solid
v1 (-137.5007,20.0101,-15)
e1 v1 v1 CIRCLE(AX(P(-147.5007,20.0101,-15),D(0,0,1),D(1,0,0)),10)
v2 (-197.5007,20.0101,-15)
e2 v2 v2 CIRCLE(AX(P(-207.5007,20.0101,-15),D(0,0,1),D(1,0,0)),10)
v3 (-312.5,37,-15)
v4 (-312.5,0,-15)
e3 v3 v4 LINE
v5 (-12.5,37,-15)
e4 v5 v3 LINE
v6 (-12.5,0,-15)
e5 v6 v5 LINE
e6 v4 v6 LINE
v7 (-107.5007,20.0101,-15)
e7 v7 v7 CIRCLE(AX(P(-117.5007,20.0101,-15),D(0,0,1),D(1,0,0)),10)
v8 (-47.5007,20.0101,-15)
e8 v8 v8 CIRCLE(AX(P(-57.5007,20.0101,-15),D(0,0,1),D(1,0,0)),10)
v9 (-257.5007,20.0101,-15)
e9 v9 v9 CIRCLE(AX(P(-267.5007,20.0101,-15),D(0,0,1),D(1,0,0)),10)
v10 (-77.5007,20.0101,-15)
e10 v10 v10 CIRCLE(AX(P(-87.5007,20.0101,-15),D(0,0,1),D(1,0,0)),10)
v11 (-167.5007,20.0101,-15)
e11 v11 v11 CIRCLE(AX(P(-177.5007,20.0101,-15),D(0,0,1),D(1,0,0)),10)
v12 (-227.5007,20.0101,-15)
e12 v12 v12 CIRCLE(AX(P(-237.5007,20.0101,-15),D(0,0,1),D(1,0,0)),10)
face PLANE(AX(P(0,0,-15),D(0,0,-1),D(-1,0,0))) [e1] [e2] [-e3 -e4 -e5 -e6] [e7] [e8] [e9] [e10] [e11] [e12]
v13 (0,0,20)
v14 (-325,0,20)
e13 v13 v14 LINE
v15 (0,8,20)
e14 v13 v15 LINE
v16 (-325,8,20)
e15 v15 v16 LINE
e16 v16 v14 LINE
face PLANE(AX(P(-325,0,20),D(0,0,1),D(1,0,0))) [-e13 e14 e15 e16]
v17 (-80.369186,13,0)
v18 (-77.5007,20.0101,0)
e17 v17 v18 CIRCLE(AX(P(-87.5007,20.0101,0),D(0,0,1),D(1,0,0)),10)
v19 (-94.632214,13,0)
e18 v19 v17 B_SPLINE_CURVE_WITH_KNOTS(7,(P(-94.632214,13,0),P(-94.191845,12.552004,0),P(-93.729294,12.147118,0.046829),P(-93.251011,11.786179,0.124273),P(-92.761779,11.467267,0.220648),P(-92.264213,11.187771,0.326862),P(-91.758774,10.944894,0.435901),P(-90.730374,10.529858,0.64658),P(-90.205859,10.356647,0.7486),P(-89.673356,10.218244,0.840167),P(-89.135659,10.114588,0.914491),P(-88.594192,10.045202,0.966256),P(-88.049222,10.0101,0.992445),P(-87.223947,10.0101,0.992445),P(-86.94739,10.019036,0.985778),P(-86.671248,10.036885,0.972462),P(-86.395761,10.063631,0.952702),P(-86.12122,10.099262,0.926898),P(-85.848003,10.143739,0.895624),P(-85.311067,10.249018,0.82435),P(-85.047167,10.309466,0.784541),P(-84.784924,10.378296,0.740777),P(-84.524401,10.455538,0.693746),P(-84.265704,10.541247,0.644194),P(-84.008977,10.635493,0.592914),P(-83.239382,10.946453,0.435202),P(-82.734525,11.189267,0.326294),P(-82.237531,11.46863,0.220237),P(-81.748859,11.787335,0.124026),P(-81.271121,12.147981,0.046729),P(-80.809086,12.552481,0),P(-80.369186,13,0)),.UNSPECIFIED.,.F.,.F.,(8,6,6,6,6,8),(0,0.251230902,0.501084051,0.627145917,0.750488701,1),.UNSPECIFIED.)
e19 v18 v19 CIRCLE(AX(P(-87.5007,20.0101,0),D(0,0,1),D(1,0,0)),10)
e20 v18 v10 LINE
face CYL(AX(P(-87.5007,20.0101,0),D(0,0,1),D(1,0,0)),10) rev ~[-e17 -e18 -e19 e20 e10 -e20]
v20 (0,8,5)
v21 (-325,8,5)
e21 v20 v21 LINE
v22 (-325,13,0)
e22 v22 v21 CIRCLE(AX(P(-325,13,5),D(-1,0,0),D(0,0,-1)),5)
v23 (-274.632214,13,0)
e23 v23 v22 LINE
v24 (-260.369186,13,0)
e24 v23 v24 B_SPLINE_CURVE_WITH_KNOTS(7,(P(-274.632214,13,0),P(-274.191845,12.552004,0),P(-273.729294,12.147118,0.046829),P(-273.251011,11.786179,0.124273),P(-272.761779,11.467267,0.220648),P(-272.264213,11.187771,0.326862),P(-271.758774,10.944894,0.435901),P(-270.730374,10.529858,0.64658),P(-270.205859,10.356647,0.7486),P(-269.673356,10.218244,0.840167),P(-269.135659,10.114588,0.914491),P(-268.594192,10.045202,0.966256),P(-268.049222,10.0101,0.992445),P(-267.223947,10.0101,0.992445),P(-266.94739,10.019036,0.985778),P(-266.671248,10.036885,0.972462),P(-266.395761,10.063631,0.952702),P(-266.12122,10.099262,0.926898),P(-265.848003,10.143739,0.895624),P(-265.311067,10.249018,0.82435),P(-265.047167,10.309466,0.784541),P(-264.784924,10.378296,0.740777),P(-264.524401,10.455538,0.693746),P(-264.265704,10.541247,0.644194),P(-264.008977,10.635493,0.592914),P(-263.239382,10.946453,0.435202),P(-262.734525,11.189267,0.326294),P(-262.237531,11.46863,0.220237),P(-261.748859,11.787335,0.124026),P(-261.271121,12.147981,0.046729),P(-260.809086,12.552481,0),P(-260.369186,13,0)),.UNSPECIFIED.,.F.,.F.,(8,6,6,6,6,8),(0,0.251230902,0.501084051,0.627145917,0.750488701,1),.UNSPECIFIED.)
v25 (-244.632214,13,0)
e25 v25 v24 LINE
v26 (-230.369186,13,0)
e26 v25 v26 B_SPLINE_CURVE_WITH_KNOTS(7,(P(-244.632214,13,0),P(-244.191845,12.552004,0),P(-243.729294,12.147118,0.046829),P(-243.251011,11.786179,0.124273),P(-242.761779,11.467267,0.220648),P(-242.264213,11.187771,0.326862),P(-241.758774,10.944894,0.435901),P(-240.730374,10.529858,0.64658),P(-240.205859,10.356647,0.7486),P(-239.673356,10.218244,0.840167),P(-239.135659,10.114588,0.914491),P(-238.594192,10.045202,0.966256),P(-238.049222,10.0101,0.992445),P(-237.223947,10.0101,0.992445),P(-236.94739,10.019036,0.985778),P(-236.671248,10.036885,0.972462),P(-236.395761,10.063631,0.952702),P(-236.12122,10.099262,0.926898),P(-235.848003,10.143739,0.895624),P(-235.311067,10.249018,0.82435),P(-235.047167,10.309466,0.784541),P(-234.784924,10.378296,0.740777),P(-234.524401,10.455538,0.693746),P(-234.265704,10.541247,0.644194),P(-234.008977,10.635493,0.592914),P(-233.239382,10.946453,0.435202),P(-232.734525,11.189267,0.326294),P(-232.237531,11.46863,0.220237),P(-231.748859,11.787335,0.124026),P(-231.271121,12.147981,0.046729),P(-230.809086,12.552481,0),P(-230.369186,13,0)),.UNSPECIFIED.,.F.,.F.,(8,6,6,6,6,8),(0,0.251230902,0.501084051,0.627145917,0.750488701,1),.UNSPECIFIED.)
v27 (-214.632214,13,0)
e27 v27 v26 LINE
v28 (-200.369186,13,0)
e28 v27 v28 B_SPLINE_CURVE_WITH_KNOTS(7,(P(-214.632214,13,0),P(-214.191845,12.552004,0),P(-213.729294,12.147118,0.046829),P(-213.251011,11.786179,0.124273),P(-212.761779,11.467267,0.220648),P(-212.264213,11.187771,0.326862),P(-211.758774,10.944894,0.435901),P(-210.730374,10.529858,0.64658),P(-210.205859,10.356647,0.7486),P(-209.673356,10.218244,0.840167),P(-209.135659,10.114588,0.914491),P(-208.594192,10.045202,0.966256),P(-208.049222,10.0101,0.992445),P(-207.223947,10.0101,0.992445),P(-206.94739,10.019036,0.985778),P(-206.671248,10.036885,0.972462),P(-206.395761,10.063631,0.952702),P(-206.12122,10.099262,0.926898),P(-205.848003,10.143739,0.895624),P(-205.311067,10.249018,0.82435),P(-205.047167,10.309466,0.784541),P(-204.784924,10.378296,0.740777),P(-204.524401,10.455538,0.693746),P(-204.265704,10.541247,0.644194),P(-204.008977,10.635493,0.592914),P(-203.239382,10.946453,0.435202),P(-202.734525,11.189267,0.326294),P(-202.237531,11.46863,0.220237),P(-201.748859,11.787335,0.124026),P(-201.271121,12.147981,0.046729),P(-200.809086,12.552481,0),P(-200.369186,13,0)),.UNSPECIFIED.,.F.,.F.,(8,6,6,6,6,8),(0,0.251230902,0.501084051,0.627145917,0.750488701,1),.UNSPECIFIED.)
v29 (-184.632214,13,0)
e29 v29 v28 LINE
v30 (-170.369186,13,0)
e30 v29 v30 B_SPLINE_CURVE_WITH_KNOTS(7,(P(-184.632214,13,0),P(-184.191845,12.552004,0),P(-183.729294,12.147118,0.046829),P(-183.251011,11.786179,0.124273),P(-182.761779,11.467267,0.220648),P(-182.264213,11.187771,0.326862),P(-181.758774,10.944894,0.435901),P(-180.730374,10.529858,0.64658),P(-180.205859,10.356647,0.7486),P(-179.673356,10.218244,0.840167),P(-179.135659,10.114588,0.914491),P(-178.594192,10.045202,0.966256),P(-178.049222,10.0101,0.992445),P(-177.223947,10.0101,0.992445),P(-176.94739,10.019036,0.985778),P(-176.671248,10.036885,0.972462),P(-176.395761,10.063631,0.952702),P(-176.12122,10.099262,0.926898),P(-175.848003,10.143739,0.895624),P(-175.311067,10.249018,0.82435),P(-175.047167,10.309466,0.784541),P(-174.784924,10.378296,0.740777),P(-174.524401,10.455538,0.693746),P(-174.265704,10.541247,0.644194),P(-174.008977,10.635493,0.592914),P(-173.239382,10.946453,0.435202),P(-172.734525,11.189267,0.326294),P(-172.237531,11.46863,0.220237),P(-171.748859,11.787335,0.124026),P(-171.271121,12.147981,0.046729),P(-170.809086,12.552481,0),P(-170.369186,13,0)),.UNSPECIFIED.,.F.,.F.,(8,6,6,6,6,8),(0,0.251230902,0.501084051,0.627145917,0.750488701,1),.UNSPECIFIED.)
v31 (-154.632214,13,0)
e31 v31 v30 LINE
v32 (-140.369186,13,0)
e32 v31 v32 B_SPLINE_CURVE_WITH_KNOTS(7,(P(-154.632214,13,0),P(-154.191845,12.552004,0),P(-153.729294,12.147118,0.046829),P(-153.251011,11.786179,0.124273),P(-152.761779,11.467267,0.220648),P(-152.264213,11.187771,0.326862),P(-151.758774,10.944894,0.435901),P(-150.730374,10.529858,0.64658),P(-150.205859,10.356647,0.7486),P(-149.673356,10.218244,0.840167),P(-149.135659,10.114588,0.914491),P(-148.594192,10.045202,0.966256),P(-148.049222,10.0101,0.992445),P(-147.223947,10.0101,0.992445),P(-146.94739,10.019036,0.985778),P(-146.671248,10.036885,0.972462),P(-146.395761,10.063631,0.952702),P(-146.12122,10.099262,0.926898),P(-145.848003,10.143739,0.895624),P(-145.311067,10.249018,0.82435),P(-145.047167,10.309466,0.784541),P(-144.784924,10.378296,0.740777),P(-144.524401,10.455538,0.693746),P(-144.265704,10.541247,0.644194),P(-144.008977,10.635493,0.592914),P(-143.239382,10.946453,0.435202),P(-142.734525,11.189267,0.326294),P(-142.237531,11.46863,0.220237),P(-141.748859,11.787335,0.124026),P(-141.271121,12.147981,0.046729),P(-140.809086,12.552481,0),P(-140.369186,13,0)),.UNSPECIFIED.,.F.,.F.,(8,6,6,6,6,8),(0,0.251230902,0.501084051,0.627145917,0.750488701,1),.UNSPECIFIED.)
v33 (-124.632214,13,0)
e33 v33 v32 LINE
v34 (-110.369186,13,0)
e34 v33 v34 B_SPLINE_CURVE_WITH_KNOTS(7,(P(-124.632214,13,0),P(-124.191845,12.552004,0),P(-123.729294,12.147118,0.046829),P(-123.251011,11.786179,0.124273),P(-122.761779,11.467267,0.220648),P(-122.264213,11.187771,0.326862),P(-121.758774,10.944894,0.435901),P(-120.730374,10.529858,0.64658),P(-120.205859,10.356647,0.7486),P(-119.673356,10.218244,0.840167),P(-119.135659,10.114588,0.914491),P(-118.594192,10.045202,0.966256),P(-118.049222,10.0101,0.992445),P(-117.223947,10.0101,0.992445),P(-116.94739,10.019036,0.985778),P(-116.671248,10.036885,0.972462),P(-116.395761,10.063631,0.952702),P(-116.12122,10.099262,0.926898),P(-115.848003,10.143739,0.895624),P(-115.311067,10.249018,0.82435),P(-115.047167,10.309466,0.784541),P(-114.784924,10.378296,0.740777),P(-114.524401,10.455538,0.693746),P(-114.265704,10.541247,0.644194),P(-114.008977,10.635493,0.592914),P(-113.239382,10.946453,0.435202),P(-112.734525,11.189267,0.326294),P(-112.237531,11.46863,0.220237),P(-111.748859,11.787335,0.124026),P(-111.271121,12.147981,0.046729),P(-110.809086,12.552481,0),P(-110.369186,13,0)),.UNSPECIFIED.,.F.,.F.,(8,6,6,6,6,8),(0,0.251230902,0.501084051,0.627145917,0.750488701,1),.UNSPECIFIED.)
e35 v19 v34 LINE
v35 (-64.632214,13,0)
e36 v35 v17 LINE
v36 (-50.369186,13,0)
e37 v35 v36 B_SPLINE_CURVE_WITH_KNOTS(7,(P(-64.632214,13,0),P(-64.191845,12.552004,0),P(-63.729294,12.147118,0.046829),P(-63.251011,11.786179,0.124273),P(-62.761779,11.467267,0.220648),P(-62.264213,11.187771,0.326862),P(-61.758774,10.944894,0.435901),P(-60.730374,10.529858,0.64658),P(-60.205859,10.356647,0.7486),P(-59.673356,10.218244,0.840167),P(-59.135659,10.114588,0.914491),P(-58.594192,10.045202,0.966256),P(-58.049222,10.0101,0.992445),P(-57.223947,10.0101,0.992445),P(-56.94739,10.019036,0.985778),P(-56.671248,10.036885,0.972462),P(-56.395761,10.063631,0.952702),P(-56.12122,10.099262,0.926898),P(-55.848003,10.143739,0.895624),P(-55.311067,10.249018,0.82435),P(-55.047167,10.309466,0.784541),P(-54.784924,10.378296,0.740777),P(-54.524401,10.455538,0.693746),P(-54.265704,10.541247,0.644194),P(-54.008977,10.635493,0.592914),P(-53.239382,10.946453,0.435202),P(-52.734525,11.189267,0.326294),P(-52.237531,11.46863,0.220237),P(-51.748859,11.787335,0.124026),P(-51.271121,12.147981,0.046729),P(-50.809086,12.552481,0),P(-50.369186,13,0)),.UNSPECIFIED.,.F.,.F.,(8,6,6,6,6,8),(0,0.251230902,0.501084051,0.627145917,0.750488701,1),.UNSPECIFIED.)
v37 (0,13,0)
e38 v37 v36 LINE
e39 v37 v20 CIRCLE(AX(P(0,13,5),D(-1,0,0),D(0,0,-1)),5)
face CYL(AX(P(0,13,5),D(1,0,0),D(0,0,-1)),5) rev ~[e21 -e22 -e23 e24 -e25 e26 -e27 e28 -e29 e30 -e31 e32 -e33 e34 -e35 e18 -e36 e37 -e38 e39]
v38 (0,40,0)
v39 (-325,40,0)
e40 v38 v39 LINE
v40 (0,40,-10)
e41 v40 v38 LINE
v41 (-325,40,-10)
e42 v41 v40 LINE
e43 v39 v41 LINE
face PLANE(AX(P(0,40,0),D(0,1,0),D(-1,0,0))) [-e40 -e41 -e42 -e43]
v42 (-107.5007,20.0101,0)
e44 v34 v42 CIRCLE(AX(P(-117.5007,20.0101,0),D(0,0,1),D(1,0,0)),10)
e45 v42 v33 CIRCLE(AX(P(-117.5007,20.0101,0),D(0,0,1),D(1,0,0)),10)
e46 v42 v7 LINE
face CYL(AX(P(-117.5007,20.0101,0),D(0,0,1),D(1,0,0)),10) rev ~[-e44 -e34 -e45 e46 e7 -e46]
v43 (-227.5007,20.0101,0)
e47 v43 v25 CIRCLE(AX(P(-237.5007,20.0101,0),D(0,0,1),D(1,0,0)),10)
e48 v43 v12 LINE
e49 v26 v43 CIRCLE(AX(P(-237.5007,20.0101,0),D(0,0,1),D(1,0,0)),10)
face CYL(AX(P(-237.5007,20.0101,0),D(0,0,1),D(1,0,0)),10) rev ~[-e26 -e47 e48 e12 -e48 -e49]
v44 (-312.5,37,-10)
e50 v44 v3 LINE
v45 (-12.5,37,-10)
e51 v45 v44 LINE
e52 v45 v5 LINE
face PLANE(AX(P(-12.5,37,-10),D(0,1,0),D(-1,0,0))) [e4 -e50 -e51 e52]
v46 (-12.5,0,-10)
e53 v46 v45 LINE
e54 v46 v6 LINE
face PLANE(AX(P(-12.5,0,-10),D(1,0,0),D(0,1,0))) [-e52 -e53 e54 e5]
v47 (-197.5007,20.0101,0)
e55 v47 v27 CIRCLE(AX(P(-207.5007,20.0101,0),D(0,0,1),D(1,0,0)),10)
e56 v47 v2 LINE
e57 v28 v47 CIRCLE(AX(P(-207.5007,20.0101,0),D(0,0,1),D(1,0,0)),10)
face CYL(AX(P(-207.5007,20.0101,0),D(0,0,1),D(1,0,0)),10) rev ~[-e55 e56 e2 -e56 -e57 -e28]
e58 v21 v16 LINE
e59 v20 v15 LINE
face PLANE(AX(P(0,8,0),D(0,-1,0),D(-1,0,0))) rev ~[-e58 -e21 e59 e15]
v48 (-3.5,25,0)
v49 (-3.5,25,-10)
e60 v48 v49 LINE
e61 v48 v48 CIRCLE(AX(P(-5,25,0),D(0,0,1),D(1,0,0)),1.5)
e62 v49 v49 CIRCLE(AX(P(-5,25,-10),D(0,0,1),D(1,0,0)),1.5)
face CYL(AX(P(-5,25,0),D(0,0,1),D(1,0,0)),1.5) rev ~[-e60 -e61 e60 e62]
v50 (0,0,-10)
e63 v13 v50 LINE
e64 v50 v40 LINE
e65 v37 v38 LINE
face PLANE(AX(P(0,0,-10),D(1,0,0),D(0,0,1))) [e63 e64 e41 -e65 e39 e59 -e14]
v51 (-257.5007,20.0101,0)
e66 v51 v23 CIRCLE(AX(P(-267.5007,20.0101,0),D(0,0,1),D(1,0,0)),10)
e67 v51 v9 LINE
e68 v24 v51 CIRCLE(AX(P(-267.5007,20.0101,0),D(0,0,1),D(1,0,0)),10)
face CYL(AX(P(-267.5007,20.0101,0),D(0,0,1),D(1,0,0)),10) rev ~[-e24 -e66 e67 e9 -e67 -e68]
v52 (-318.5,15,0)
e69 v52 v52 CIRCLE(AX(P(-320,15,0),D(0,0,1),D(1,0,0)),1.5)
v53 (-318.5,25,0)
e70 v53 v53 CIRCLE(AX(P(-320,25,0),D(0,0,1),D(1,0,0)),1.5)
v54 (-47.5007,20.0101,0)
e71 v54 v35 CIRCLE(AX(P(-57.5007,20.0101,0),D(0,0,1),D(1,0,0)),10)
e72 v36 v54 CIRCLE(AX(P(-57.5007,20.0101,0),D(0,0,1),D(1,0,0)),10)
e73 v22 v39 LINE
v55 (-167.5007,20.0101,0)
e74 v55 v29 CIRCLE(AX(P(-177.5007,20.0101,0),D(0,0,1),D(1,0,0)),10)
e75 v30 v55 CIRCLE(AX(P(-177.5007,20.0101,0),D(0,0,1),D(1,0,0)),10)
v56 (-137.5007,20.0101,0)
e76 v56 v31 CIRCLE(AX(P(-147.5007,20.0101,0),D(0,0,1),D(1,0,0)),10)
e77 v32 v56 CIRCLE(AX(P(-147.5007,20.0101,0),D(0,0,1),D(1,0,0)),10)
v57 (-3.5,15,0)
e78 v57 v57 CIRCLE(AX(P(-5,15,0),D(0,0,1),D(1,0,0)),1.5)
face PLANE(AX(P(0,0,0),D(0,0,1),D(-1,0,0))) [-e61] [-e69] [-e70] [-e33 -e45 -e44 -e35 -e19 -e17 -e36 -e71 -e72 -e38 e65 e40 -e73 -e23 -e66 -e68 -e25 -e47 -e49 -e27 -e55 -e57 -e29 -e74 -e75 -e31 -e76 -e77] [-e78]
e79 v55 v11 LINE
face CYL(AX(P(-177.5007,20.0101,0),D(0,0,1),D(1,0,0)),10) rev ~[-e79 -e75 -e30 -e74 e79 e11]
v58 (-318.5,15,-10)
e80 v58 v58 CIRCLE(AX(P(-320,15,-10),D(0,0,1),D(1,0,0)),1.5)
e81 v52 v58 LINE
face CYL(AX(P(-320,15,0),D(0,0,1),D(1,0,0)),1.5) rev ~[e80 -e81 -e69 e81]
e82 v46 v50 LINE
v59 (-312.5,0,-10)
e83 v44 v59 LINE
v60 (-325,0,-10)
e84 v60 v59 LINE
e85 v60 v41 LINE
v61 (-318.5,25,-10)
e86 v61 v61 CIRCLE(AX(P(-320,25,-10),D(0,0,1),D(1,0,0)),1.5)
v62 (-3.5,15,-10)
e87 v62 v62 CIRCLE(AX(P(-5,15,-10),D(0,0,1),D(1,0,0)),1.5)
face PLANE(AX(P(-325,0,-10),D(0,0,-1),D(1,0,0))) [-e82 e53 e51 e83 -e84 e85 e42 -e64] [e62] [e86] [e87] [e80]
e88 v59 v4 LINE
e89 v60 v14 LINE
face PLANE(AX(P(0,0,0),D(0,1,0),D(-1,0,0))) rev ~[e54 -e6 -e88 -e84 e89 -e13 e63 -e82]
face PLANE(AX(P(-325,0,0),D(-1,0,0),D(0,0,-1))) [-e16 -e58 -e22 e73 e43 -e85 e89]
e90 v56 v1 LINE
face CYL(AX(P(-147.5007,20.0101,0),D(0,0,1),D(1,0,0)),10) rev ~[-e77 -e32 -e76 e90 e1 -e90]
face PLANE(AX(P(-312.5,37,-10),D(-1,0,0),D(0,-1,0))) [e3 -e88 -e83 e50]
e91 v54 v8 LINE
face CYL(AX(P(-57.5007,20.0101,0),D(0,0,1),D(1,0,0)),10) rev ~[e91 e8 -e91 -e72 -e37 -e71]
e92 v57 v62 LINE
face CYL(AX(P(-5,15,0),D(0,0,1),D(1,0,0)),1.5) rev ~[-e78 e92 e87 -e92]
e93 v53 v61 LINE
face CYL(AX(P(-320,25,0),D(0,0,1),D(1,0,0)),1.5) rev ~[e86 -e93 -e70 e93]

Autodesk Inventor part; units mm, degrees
ref_plane "YZ Plane" through (0, 0, 0) normal (1, 0, 0) x (0, 1, 0)
ref_plane "XZ Plane" through (0, 0, 0) normal (0, 1, 0) x (-1, 0, 0)
ref_plane "XY Plane" through (0, 0, 0) normal (0, 0, 1) x (1, 0, 0)
sketch "Sketch1" plane through (0, 0, 0) normal (0, 1, 0) x (-1, 0, 0)
  line L0 (0, 0) -> (325, 0)
  line L1 (325, 0) -> (325, -10)
  line L2 (325, -10) -> (0, -10)
  line L3 (0, -10) -> (0, 0)
  dimension "d0" = 325
  dimension "d1" = 10
extrude "Extrusion1" add sketch "Sketch1" along normal blind 40
sketch "Sketch4" plane through (-325, 0, 0) normal (0, 0, 1) x (1, 0, 0)
  line L0 (325, 0) -> (0, 0) projected
  line L1 (325, 0) -> (325, 40) projected
  line L2 (0, 0) -> (325, 0)
  line L3 (325, 0) -> (325, 8)
  line L4 (325, 8) -> (0, 8)
  line L5 (0, 8) -> (0, 0)
  dimension "d34" = 8
extrude "Extrusion3" add sketch "Sketch4" along normal blind 20
sketch "Sketch5" plane through (-325, 40, 0) normal (0, 0, 1) x (1, 0, 0)
  circle A0 centre (320, -25) radius 1.5
  circle A1 centre (320, -15) radius 1.5
  line L0 (325, -32) -> (325, 0) projected
  line L1 (0, 0) -> (325, 0) projected
  circle A2 centre (5, -15) radius 1.5
  circle A3 centre (5, -25) radius 1.5
  line L2 (0, -32) -> (0, 0) projected
  point P0 (325, -40)
  point P1 (325, -27)
  point P2 (0, -27)
  dimension "d39" = 3
  dimension "d40" = 3
  dimension "d41" = 5
  dimension "d42" = 5
  dimension "d43" = 10
  dimension "d44" = 15
  dimension "d45" = 3
  dimension "d46" = 3
  dimension "d47" = 10
  dimension "d48" = 15
  dimension "d49" = 5
  dimension "d50" = 5
extrude "Extrusion4" cut sketch "Sketch5" against normal blind 20
thread "Thread1" size "M3x0.5" class "6H" standard "ANSI Metric M Profile" full length
thread "Thread2" size "M3x0.5" class "6H" standard "ANSI Metric M Profile" full length
thread "Thread3" size "M3x0.5" class "6H" standard "ANSI Metric M Profile" full length
thread "Thread4" size "M3x0.5" class "6H" standard "ANSI Metric M Profile" full length
sketch "Sketch8" plane through (0, 0, -10) normal (0, 0, -1) x (-1, 0, 0)
  line L0 (0, 40) -> (325, 40) projected
  line L1 (12.5, 37) -> (312.5, 37)
  line L2 (312.5, 37) -> (312.5, 0)
  line L3 (312.5, 0) -> (12.5, 0)
  line L4 (12.5, 0) -> (12.5, 37)
  line L5 (0, 0) -> (0, 40) projected
  line L6 (325, 0) -> (325, 40) projected
  point P0 (312.5, 18.5)
  dimension "d67" = 300
  dimension "d68" = 37
  dimension "d69" = 12.5
  dimension "d70" = 12.5
  dimension "d71" = 3
extrude "Extrusion5" add sketch "Sketch8" along normal blind 5
sketch "Sketch9" plane through (-325, 40, 0) normal (0, 0, 1) x (1, 0, 0)
  circle A0 centre (57.4993, -19.9899) radius 10
  circle A1 centre (87.4993, -19.9899) radius 10
  circle A2 centre (117.4993, -19.9899) radius 10
  circle A3 centre (147.4993, -19.9899) radius 10
  circle A4 centre (177.4993, -19.9899) radius 10
  circle A5 centre (207.4993, -19.9899) radius 10
  circle A6 centre (237.4993, -19.9899) radius 10
  circle A7 centre (267.4993, -19.9899) radius 10
  line L0 (-0.0007, -39.9899) -> (-0.0007, 0.0101)
  line L1 (324.9993, -39.9899) -> (324.9993, 0.0101)
  line L2 (-0.0007, 0.0101) -> (324.9993, 0.0101)
  point P0 (325, -40)
  dimension "d74" = 20
  dimension "d75" = 20
  dimension "d76" = 20
  dimension "d77" = 20
  dimension "d78" = 20
  dimension "d79" = 20
  dimension "d80" = 20
  dimension "d81" = 20
  dimension "d82" = 30
  dimension "d83" = 30
  dimension "d84" = 30
  dimension "d85" = 30
  dimension "d86" = 30
  dimension "d87" = 30
  dimension "d88" = 30
  dimension "d89" = 57.5
  dimension "d90" = 20
  dimension "d91" = 57.5
extrude "Extrusion6" cut sketch "Sketch9" against normal blind 40
fillet "Fillet2" radius 5 1 edges at (-162.5, 8, 0)
equation "\"d83\" = d82"
equation "\"d84\" = d83"
equation "\"d85\" = d84"
equation "\"d86\" = d85"
equation "\"d87\" = d86"
equation "\"d88\" = d87"
properties part number "chessboard-base-1"
